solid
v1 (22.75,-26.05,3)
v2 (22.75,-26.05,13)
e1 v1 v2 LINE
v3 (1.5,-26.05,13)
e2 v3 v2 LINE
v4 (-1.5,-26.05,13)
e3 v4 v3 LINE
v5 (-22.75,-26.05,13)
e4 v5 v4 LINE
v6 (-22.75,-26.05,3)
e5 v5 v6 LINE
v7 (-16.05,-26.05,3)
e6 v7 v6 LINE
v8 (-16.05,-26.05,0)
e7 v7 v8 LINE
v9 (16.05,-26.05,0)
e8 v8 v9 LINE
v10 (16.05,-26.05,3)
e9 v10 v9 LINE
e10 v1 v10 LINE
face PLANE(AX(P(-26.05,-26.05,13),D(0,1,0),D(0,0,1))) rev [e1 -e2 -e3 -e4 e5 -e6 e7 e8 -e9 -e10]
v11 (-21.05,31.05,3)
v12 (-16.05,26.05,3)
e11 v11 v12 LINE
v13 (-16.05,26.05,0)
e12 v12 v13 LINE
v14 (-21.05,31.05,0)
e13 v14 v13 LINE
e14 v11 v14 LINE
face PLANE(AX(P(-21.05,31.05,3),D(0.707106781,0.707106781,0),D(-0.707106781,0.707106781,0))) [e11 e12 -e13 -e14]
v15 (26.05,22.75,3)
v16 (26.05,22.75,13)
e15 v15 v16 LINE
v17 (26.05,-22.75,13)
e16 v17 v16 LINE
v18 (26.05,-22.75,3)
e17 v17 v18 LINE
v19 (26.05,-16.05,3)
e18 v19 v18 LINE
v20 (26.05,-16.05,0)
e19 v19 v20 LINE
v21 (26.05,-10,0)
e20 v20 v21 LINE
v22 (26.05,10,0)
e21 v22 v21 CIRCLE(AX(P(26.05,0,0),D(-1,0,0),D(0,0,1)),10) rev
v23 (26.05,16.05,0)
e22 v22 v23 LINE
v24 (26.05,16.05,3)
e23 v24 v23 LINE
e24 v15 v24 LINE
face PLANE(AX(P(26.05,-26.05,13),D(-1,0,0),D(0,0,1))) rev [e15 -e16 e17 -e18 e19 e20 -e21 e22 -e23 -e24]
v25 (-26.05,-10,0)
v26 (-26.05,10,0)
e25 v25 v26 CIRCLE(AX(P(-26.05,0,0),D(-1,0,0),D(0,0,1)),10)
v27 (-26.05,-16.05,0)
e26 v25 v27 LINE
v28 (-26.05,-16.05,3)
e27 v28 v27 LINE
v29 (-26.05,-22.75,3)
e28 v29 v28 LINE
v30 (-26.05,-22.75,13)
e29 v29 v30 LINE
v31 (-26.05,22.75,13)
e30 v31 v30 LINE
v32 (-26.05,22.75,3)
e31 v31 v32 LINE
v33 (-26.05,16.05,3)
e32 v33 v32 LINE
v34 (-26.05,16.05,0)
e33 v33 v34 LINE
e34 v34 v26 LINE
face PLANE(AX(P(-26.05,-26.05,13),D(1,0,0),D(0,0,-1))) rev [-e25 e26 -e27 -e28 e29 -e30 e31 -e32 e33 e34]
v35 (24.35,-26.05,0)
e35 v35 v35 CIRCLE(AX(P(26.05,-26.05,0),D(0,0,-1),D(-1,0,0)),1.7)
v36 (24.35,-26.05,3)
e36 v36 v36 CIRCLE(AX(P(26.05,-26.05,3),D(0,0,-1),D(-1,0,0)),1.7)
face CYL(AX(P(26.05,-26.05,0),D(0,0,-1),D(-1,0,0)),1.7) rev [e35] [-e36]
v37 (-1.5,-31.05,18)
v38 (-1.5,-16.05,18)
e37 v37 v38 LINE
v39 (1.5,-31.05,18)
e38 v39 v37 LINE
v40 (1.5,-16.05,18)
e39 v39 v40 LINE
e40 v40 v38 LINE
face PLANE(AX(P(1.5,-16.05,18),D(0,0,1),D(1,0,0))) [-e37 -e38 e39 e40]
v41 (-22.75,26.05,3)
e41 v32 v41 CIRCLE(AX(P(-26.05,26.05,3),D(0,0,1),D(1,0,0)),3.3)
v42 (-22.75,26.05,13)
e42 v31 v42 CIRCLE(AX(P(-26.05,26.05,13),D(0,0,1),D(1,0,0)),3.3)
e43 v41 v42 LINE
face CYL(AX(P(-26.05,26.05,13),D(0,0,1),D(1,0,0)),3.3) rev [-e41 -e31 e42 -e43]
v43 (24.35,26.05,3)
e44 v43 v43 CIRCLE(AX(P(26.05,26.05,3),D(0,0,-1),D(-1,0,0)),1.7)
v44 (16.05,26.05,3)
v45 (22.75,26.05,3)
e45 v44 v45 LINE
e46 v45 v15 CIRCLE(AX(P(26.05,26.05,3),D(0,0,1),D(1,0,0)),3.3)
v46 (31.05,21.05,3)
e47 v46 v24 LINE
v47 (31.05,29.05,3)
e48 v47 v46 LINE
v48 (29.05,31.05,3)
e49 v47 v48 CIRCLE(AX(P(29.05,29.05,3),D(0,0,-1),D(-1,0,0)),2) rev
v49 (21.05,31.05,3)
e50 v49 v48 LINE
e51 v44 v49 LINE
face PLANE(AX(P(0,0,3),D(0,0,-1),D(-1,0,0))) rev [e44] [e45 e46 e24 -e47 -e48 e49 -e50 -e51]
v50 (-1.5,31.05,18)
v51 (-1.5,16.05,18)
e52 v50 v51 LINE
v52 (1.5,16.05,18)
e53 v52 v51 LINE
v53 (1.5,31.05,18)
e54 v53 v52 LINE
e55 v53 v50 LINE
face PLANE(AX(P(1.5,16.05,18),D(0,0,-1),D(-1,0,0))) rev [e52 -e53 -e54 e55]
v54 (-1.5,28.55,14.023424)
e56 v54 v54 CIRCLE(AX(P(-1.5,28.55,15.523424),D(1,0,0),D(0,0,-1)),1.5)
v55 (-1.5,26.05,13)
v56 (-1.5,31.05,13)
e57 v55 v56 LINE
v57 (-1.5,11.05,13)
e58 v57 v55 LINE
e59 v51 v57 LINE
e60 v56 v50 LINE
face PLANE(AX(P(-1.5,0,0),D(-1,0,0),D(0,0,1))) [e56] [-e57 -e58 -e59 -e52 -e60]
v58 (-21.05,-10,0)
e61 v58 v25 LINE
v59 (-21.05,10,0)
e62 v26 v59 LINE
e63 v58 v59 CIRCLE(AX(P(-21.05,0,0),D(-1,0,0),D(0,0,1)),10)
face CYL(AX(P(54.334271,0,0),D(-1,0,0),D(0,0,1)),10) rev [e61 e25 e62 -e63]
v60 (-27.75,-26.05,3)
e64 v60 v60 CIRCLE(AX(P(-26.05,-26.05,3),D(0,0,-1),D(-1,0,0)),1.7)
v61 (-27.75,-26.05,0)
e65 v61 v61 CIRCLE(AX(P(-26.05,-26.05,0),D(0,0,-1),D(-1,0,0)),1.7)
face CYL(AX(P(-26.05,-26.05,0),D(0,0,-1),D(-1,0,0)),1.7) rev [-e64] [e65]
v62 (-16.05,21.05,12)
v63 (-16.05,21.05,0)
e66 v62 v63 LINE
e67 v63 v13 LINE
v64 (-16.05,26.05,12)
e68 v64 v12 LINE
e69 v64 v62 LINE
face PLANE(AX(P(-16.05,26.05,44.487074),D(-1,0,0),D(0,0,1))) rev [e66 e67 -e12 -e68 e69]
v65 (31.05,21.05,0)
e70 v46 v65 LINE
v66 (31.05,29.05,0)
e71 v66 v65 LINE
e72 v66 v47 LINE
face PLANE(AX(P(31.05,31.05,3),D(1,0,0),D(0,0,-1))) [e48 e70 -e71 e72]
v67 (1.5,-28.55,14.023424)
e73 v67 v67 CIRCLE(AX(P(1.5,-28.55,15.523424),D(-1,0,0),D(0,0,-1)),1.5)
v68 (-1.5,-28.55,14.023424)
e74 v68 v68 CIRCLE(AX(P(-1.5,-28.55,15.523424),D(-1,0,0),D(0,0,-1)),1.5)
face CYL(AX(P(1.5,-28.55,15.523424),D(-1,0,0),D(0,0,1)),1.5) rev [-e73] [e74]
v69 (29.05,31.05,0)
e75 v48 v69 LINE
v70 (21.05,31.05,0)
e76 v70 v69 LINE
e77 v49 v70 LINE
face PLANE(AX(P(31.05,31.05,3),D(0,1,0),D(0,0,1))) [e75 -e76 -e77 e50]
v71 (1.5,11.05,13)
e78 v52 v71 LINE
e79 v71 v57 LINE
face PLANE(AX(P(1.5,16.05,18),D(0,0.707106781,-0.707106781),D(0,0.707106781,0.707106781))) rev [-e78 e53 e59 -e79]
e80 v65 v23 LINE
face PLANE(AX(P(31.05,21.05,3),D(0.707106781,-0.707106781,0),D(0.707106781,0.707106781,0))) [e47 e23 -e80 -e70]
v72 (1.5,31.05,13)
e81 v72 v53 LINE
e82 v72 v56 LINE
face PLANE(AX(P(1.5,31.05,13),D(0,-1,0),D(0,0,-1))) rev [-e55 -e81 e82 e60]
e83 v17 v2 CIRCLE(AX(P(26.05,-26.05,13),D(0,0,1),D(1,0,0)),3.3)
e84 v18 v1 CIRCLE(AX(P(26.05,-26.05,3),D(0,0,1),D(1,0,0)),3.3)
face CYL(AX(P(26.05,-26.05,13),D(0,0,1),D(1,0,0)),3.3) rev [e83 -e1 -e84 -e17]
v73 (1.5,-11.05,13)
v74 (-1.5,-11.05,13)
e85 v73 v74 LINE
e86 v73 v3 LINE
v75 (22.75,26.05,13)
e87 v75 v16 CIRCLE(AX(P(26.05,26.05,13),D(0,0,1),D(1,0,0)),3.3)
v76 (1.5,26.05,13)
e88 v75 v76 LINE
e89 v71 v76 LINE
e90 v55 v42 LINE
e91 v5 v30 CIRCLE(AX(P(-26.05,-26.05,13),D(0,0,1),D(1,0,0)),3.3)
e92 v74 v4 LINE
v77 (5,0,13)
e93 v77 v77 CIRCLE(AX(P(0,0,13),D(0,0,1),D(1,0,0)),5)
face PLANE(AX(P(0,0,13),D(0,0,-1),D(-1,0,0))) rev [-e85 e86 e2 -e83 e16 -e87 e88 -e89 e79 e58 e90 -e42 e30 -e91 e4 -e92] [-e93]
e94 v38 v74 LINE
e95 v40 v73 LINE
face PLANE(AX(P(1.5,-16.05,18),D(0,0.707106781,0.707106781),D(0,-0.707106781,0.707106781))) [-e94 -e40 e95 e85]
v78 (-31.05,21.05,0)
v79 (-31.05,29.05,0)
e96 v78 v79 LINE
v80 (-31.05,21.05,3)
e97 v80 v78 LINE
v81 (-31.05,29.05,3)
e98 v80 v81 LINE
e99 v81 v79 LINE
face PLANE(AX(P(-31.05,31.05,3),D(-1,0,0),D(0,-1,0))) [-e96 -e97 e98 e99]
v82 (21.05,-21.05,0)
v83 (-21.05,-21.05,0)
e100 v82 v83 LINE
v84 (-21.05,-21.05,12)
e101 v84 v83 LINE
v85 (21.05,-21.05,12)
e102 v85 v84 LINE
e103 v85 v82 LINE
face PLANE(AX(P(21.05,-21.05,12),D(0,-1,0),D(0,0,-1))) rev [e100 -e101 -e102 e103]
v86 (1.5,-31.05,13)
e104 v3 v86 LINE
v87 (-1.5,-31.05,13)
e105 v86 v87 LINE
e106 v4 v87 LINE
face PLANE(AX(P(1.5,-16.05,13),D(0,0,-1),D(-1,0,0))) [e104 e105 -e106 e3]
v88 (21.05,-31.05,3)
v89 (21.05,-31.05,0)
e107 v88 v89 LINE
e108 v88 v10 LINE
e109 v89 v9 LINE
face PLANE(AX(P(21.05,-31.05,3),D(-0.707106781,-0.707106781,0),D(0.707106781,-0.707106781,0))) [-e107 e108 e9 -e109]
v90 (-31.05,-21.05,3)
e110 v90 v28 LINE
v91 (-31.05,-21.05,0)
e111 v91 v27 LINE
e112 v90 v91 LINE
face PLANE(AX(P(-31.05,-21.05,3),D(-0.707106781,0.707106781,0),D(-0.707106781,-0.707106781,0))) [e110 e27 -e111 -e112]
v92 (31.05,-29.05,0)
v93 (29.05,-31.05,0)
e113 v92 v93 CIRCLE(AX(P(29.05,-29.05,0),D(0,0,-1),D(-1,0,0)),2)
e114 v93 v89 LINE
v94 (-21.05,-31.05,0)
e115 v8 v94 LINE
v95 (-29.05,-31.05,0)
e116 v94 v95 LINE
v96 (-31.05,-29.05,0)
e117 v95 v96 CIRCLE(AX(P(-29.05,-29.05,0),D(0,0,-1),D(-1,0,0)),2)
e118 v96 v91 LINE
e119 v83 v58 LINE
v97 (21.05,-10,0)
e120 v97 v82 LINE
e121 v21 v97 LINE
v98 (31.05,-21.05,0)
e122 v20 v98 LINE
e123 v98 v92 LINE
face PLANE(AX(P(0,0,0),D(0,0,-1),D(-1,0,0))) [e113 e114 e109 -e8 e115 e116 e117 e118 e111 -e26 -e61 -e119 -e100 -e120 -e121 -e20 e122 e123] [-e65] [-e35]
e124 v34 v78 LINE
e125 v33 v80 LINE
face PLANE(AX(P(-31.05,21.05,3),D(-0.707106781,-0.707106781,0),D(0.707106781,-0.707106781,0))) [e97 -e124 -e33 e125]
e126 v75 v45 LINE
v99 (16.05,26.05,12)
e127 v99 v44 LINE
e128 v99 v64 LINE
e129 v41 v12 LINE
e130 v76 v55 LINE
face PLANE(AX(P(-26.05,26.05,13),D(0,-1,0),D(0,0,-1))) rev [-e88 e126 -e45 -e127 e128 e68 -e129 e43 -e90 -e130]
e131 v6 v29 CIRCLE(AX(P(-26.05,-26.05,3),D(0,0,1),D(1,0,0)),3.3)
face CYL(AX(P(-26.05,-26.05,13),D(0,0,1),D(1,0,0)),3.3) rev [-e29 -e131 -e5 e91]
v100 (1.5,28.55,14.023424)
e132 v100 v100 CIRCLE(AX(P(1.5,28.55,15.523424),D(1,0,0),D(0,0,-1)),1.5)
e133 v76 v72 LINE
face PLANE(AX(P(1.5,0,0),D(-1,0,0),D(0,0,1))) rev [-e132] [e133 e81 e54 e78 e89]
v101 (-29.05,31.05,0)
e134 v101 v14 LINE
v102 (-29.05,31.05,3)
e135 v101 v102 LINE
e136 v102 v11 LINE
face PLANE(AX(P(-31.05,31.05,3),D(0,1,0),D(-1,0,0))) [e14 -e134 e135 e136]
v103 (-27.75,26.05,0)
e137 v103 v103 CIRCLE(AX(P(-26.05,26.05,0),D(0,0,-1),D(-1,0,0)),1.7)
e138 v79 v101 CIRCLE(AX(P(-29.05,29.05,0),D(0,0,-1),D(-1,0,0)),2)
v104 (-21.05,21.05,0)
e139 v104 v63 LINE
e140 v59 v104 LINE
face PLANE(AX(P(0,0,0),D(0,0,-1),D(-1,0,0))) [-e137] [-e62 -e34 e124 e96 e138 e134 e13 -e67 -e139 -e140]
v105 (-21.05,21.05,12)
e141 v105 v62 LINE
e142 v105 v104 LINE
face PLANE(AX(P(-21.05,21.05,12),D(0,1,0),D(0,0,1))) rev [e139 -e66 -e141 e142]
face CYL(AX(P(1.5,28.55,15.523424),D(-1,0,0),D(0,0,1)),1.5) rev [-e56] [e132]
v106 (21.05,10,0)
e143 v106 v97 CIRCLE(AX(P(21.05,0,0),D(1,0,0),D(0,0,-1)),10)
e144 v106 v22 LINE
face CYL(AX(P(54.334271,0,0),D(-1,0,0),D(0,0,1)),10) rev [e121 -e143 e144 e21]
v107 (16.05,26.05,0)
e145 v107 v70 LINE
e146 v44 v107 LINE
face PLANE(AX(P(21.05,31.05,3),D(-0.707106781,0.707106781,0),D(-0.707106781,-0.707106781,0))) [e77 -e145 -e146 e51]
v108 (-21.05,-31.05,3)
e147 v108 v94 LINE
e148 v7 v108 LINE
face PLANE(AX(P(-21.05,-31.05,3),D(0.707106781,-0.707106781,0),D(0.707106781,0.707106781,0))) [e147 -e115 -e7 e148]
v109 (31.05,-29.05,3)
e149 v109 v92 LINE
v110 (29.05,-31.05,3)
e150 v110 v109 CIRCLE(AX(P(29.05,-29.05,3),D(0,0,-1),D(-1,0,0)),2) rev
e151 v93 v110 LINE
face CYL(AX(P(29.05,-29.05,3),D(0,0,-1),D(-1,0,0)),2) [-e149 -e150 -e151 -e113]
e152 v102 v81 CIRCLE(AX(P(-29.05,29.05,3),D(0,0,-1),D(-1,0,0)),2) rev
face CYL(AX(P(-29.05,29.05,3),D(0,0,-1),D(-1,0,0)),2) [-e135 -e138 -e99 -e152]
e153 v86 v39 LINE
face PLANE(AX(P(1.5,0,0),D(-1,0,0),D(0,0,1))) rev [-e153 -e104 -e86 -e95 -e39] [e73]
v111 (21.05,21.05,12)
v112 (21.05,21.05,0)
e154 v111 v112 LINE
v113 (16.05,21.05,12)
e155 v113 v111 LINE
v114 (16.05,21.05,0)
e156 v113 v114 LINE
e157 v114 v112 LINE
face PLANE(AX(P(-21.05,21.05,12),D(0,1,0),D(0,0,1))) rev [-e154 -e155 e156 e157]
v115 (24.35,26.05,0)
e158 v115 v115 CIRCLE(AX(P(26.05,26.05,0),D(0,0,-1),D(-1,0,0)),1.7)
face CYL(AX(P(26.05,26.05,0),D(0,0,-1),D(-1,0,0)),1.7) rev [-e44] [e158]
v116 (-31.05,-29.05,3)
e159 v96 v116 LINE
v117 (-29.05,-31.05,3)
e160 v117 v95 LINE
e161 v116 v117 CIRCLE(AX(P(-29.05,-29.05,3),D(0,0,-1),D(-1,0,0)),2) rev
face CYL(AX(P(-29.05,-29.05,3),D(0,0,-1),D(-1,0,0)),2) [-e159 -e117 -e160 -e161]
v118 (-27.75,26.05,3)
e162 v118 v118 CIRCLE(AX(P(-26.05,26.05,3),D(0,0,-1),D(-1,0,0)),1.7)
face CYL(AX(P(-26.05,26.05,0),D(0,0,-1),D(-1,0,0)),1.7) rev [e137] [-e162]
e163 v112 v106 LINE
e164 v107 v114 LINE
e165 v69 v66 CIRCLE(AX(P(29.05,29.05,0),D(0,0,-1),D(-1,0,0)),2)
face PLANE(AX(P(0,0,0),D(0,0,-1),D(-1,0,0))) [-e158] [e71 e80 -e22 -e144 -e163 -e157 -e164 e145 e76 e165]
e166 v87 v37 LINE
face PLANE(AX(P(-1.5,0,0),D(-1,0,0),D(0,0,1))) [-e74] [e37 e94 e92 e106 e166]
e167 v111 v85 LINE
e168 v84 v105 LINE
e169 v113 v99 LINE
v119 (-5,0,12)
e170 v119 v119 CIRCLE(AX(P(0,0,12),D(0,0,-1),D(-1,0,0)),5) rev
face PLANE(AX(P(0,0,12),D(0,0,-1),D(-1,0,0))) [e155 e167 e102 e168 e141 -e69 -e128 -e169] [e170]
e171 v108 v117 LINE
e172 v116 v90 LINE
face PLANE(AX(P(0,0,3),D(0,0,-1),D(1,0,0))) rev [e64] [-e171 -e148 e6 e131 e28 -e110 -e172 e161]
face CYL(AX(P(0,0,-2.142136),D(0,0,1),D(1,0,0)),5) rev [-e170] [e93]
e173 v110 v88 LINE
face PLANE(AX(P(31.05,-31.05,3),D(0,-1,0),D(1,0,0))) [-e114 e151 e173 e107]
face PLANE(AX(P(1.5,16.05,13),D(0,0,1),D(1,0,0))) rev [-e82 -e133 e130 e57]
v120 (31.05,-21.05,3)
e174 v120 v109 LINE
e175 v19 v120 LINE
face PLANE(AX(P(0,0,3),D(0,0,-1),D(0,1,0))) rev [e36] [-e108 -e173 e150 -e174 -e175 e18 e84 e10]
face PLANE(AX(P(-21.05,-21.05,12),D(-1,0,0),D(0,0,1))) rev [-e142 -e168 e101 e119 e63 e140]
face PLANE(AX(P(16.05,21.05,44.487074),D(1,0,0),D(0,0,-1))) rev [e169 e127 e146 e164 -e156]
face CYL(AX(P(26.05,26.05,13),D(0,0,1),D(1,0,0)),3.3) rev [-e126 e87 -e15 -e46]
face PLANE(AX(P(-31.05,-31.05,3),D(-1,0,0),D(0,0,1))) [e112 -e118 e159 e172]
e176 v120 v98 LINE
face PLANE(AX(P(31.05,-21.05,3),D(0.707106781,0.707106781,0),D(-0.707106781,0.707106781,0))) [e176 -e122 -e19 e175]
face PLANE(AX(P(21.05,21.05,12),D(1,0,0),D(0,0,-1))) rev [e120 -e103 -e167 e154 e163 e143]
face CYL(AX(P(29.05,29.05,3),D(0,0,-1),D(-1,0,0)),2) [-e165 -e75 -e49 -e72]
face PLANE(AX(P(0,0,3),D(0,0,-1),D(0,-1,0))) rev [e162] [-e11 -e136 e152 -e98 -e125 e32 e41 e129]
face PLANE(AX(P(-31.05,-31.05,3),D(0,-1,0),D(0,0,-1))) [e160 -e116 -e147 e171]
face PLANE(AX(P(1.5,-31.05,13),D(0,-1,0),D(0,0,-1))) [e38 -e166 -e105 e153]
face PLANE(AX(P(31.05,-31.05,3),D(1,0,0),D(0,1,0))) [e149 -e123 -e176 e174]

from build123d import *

# Parameters (mm, degrees)
CROQUIS1_W                       = 52.1
CROQUIS1_H                       = 52.1
SALIENTE_EXTRUIR1_DEPTH          = 13
CROQUIS2_W                       = 42.1
CROQUIS2_H                       = 42.1
CORTAR_EXTRUIR1_DEPTH            = 12
SALIENTE_EXTRUIR2_DEPTH          = 3
TALADRO_DE_MARGEN_PARA_M31_D     = 3.4
TALADRO_START                    = 3
TALADRO_DE_MARGEN_PARA_M61_DEPTH = 10
REDONDEO1_R                      = 2
CROQUIS10_R                      = 5
CORTAR_EXTRUIR2_DEPTH            = 1
MATRIZC1_COUNT                   = 4
REDONDEO1_OF_MATRIZC1_R          = 2
CORTAR_EXTRUIR3_REACH            = 47.795
CROQUIS11_W                      = 32.1
CROQUIS11_H                      = 5
CORTAR_EXTRUIR4_REACH            = 68.284
CROQUIS12_R                      = 10
CROQUIS13_R                      = 1.5
SALIENTE_EXTRUIR3_DEPTH          = 1.5


# Read off the part's stored shape, not the designer's step: Taladro de margen para M61
with BuildPart() as part:
    # Croquis1 → Saliente-Extruir1 (new body)
    with BuildSketch(Plane.XY):
        Rectangle(CROQUIS1_W, CROQUIS1_H)
    extrude(amount=SALIENTE_EXTRUIR1_DEPTH)

    # Croquis2 → Cortar-Extruir1 (cut)
    with BuildSketch(Plane(origin=(0, 0, 0), x_dir=(-1, 0, 0), z_dir=(0, 0, -1))):
        Rectangle(CROQUIS2_W, CROQUIS2_H)
    extrude(amount=-CORTAR_EXTRUIR1_DEPTH, mode=Mode.SUBTRACT)

    # Croquis3 → Saliente-Extruir2 (add)
    with BuildSketch(Plane(origin=(0, 0, 0), x_dir=(-1, 0, 0), z_dir=(0, 0, -1))):
        Polygon((-31.05, 21.05), (-26.05, 16.05), (-26.05, 21.05), (-21.05, 21.05), (-21.05, 26.05), (-16.05, 26.05), (-21.05, 31.05), (-31.05, 31.05), align=None)
    saliente_extruir2 = extrude(amount=-SALIENTE_EXTRUIR2_DEPTH)

    # Taladro de margen para M31 (through all)
    with Locations(Plane(origin=(0, 0, 0), x_dir=(-1, 0, 0), z_dir=(0, 0, -1))):
        with Locations((-26.05, 26.05)):
            taladro_de_margen_para_m31 = Hole(TALADRO_DE_MARGEN_PARA_M31_D / 2)

    # Taladro de margen para M61 outline → Taladro de margen para M61 (cut)
    with BuildSketch(Plane.XY.offset(TALADRO_START)):
        with BuildLine():
            Line((24.35, 26.05), (22.75, 26.05))
            ThreePointArc((22.75, 26.05), (23.716547622, 23.716547622), (26.05, 22.75))
            Line((26.05, 22.75), (26.05, 24.35))
            ThreePointArc((26.05, 24.35), (24.847918472, 24.847918472), (24.35, 26.05))
        make_face()
    taladro_de_margen_para_m61 = extrude(amount=TALADRO_DE_MARGEN_PARA_M61_DEPTH, mode=Mode.SUBTRACT)

    # Redondeo1
    redondeo1_edges = [part.edges().sort_by_distance(p)[0] for p in [
        (31.05, 31.05, 1.5),
    ]]
    fillet(redondeo1_edges, radius=REDONDEO1_R)

    # Croquis10 → Cortar-Extruir2 (cut)
    with BuildSketch(Plane.XY.offset(13)):
        Circle(CROQUIS10_R)
    extrude(amount=-CORTAR_EXTRUIR2_DEPTH, mode=Mode.SUBTRACT)

    # MatrizC1: Saliente-Extruir2, Taladro de margen para M31, Taladro de margen para M61 ×4 about axis
    matrizc1_axis = Axis((0, 0, 0), (0, 0, 1))
    add([saliente_extruir2.rotate(matrizc1_axis, i * 360 / MATRIZC1_COUNT) for i in range(1, MATRIZC1_COUNT)])
    add([taladro_de_margen_para_m31.rotate(matrizc1_axis, i * 360 / MATRIZC1_COUNT) for i in range(1, MATRIZC1_COUNT)], mode=Mode.SUBTRACT)
    add([taladro_de_margen_para_m61.rotate(matrizc1_axis, i * 360 / MATRIZC1_COUNT) for i in range(1, MATRIZC1_COUNT)], mode=Mode.SUBTRACT)

    # Redondeo1 of MatrizC1
    redondeo1_of_matrizc1_edges = [part.edges().sort_by_distance(p)[0] for p in [
        (-31.05, 31.05, 1.5),
        (-31.05, -31.05, 1.5),
        (31.05, -31.05, 1.5),
    ]]
    fillet(redondeo1_of_matrizc1_edges, radius=REDONDEO1_OF_MATRIZC1_R)

    # Cortar-Extruir3: up to this face of the body (flat: up to its plane)
    cortar_extruir3_end = Plane(part.part.faces().sort_by_distance((20.45461609, 0, 12))[0])
    # Croquis11 → Cortar-Extruir3 (cut, up to the picked face)
    with BuildSketch(Plane(origin=(0, 0, 0), x_dir=(-1, 0, 0), z_dir=(0, 0, -1)), mode=Mode.PRIVATE) as cortar_extruir3_sk1:
        with Locations((0, 23.55)):
            Rectangle(CROQUIS11_W, CROQUIS11_H)
    cortar_extruir3_tool1 = split(extrude(cortar_extruir3_sk1.sketch, amount=-CORTAR_EXTRUIR3_REACH, mode=Mode.PRIVATE), bisect_by=cortar_extruir3_end, keep=Keep.BOTH, mode=Mode.PRIVATE)
    add(cortar_extruir3_tool1.solids().sort_by(Axis((0, 23.55, 0), (0, 0, 1)))[0], mode=Mode.SUBTRACT)

    # Cortar-Extruir4: up to this face of the body (flat: up to its plane)
    cortar_extruir4_end = Plane(part.part.faces().sort_by_distance((26.05, 0, 6.864592781))[0])
    # Croquis12 → Cortar-Extruir4 (cut, up to the picked face)
    with BuildSketch(Plane.ZY.offset(26.05), mode=Mode.PRIVATE) as cortar_extruir4_sk1:
        Circle(CROQUIS12_R)
    cortar_extruir4_tool1 = split(extrude(cortar_extruir4_sk1.sketch, amount=-CORTAR_EXTRUIR4_REACH, mode=Mode.PRIVATE), bisect_by=cortar_extruir4_end, keep=Keep.BOTH, mode=Mode.PRIVATE)
    add(cortar_extruir4_tool1.solids().sort_by(Axis((-26.05, 0, 0), (1, 0, 0)))[0], mode=Mode.SUBTRACT)

    # Croquis13 → Saliente-Extruir3 (add, symmetric)
    with BuildSketch(Plane(origin=(0, 0, 0), x_dir=(0, 0, -1), z_dir=(1, 0, 0))):
        Polygon((-13, 16.05), (-13, 31.05), (-18, 31.05), (-18, 16.05), (-13, 11.05), align=None)
        with Locations((-15.523423592, 28.55)):
            Circle(CROQUIS13_R, mode=Mode.SUBTRACT)
    saliente_extruir3 = extrude(amount=SALIENTE_EXTRUIR3_DEPTH, both=True)

    # Simetría1: Saliente-Extruir3 across plane
    add(saliente_extruir3.mirror(Plane.ZX))


solid = part.part
